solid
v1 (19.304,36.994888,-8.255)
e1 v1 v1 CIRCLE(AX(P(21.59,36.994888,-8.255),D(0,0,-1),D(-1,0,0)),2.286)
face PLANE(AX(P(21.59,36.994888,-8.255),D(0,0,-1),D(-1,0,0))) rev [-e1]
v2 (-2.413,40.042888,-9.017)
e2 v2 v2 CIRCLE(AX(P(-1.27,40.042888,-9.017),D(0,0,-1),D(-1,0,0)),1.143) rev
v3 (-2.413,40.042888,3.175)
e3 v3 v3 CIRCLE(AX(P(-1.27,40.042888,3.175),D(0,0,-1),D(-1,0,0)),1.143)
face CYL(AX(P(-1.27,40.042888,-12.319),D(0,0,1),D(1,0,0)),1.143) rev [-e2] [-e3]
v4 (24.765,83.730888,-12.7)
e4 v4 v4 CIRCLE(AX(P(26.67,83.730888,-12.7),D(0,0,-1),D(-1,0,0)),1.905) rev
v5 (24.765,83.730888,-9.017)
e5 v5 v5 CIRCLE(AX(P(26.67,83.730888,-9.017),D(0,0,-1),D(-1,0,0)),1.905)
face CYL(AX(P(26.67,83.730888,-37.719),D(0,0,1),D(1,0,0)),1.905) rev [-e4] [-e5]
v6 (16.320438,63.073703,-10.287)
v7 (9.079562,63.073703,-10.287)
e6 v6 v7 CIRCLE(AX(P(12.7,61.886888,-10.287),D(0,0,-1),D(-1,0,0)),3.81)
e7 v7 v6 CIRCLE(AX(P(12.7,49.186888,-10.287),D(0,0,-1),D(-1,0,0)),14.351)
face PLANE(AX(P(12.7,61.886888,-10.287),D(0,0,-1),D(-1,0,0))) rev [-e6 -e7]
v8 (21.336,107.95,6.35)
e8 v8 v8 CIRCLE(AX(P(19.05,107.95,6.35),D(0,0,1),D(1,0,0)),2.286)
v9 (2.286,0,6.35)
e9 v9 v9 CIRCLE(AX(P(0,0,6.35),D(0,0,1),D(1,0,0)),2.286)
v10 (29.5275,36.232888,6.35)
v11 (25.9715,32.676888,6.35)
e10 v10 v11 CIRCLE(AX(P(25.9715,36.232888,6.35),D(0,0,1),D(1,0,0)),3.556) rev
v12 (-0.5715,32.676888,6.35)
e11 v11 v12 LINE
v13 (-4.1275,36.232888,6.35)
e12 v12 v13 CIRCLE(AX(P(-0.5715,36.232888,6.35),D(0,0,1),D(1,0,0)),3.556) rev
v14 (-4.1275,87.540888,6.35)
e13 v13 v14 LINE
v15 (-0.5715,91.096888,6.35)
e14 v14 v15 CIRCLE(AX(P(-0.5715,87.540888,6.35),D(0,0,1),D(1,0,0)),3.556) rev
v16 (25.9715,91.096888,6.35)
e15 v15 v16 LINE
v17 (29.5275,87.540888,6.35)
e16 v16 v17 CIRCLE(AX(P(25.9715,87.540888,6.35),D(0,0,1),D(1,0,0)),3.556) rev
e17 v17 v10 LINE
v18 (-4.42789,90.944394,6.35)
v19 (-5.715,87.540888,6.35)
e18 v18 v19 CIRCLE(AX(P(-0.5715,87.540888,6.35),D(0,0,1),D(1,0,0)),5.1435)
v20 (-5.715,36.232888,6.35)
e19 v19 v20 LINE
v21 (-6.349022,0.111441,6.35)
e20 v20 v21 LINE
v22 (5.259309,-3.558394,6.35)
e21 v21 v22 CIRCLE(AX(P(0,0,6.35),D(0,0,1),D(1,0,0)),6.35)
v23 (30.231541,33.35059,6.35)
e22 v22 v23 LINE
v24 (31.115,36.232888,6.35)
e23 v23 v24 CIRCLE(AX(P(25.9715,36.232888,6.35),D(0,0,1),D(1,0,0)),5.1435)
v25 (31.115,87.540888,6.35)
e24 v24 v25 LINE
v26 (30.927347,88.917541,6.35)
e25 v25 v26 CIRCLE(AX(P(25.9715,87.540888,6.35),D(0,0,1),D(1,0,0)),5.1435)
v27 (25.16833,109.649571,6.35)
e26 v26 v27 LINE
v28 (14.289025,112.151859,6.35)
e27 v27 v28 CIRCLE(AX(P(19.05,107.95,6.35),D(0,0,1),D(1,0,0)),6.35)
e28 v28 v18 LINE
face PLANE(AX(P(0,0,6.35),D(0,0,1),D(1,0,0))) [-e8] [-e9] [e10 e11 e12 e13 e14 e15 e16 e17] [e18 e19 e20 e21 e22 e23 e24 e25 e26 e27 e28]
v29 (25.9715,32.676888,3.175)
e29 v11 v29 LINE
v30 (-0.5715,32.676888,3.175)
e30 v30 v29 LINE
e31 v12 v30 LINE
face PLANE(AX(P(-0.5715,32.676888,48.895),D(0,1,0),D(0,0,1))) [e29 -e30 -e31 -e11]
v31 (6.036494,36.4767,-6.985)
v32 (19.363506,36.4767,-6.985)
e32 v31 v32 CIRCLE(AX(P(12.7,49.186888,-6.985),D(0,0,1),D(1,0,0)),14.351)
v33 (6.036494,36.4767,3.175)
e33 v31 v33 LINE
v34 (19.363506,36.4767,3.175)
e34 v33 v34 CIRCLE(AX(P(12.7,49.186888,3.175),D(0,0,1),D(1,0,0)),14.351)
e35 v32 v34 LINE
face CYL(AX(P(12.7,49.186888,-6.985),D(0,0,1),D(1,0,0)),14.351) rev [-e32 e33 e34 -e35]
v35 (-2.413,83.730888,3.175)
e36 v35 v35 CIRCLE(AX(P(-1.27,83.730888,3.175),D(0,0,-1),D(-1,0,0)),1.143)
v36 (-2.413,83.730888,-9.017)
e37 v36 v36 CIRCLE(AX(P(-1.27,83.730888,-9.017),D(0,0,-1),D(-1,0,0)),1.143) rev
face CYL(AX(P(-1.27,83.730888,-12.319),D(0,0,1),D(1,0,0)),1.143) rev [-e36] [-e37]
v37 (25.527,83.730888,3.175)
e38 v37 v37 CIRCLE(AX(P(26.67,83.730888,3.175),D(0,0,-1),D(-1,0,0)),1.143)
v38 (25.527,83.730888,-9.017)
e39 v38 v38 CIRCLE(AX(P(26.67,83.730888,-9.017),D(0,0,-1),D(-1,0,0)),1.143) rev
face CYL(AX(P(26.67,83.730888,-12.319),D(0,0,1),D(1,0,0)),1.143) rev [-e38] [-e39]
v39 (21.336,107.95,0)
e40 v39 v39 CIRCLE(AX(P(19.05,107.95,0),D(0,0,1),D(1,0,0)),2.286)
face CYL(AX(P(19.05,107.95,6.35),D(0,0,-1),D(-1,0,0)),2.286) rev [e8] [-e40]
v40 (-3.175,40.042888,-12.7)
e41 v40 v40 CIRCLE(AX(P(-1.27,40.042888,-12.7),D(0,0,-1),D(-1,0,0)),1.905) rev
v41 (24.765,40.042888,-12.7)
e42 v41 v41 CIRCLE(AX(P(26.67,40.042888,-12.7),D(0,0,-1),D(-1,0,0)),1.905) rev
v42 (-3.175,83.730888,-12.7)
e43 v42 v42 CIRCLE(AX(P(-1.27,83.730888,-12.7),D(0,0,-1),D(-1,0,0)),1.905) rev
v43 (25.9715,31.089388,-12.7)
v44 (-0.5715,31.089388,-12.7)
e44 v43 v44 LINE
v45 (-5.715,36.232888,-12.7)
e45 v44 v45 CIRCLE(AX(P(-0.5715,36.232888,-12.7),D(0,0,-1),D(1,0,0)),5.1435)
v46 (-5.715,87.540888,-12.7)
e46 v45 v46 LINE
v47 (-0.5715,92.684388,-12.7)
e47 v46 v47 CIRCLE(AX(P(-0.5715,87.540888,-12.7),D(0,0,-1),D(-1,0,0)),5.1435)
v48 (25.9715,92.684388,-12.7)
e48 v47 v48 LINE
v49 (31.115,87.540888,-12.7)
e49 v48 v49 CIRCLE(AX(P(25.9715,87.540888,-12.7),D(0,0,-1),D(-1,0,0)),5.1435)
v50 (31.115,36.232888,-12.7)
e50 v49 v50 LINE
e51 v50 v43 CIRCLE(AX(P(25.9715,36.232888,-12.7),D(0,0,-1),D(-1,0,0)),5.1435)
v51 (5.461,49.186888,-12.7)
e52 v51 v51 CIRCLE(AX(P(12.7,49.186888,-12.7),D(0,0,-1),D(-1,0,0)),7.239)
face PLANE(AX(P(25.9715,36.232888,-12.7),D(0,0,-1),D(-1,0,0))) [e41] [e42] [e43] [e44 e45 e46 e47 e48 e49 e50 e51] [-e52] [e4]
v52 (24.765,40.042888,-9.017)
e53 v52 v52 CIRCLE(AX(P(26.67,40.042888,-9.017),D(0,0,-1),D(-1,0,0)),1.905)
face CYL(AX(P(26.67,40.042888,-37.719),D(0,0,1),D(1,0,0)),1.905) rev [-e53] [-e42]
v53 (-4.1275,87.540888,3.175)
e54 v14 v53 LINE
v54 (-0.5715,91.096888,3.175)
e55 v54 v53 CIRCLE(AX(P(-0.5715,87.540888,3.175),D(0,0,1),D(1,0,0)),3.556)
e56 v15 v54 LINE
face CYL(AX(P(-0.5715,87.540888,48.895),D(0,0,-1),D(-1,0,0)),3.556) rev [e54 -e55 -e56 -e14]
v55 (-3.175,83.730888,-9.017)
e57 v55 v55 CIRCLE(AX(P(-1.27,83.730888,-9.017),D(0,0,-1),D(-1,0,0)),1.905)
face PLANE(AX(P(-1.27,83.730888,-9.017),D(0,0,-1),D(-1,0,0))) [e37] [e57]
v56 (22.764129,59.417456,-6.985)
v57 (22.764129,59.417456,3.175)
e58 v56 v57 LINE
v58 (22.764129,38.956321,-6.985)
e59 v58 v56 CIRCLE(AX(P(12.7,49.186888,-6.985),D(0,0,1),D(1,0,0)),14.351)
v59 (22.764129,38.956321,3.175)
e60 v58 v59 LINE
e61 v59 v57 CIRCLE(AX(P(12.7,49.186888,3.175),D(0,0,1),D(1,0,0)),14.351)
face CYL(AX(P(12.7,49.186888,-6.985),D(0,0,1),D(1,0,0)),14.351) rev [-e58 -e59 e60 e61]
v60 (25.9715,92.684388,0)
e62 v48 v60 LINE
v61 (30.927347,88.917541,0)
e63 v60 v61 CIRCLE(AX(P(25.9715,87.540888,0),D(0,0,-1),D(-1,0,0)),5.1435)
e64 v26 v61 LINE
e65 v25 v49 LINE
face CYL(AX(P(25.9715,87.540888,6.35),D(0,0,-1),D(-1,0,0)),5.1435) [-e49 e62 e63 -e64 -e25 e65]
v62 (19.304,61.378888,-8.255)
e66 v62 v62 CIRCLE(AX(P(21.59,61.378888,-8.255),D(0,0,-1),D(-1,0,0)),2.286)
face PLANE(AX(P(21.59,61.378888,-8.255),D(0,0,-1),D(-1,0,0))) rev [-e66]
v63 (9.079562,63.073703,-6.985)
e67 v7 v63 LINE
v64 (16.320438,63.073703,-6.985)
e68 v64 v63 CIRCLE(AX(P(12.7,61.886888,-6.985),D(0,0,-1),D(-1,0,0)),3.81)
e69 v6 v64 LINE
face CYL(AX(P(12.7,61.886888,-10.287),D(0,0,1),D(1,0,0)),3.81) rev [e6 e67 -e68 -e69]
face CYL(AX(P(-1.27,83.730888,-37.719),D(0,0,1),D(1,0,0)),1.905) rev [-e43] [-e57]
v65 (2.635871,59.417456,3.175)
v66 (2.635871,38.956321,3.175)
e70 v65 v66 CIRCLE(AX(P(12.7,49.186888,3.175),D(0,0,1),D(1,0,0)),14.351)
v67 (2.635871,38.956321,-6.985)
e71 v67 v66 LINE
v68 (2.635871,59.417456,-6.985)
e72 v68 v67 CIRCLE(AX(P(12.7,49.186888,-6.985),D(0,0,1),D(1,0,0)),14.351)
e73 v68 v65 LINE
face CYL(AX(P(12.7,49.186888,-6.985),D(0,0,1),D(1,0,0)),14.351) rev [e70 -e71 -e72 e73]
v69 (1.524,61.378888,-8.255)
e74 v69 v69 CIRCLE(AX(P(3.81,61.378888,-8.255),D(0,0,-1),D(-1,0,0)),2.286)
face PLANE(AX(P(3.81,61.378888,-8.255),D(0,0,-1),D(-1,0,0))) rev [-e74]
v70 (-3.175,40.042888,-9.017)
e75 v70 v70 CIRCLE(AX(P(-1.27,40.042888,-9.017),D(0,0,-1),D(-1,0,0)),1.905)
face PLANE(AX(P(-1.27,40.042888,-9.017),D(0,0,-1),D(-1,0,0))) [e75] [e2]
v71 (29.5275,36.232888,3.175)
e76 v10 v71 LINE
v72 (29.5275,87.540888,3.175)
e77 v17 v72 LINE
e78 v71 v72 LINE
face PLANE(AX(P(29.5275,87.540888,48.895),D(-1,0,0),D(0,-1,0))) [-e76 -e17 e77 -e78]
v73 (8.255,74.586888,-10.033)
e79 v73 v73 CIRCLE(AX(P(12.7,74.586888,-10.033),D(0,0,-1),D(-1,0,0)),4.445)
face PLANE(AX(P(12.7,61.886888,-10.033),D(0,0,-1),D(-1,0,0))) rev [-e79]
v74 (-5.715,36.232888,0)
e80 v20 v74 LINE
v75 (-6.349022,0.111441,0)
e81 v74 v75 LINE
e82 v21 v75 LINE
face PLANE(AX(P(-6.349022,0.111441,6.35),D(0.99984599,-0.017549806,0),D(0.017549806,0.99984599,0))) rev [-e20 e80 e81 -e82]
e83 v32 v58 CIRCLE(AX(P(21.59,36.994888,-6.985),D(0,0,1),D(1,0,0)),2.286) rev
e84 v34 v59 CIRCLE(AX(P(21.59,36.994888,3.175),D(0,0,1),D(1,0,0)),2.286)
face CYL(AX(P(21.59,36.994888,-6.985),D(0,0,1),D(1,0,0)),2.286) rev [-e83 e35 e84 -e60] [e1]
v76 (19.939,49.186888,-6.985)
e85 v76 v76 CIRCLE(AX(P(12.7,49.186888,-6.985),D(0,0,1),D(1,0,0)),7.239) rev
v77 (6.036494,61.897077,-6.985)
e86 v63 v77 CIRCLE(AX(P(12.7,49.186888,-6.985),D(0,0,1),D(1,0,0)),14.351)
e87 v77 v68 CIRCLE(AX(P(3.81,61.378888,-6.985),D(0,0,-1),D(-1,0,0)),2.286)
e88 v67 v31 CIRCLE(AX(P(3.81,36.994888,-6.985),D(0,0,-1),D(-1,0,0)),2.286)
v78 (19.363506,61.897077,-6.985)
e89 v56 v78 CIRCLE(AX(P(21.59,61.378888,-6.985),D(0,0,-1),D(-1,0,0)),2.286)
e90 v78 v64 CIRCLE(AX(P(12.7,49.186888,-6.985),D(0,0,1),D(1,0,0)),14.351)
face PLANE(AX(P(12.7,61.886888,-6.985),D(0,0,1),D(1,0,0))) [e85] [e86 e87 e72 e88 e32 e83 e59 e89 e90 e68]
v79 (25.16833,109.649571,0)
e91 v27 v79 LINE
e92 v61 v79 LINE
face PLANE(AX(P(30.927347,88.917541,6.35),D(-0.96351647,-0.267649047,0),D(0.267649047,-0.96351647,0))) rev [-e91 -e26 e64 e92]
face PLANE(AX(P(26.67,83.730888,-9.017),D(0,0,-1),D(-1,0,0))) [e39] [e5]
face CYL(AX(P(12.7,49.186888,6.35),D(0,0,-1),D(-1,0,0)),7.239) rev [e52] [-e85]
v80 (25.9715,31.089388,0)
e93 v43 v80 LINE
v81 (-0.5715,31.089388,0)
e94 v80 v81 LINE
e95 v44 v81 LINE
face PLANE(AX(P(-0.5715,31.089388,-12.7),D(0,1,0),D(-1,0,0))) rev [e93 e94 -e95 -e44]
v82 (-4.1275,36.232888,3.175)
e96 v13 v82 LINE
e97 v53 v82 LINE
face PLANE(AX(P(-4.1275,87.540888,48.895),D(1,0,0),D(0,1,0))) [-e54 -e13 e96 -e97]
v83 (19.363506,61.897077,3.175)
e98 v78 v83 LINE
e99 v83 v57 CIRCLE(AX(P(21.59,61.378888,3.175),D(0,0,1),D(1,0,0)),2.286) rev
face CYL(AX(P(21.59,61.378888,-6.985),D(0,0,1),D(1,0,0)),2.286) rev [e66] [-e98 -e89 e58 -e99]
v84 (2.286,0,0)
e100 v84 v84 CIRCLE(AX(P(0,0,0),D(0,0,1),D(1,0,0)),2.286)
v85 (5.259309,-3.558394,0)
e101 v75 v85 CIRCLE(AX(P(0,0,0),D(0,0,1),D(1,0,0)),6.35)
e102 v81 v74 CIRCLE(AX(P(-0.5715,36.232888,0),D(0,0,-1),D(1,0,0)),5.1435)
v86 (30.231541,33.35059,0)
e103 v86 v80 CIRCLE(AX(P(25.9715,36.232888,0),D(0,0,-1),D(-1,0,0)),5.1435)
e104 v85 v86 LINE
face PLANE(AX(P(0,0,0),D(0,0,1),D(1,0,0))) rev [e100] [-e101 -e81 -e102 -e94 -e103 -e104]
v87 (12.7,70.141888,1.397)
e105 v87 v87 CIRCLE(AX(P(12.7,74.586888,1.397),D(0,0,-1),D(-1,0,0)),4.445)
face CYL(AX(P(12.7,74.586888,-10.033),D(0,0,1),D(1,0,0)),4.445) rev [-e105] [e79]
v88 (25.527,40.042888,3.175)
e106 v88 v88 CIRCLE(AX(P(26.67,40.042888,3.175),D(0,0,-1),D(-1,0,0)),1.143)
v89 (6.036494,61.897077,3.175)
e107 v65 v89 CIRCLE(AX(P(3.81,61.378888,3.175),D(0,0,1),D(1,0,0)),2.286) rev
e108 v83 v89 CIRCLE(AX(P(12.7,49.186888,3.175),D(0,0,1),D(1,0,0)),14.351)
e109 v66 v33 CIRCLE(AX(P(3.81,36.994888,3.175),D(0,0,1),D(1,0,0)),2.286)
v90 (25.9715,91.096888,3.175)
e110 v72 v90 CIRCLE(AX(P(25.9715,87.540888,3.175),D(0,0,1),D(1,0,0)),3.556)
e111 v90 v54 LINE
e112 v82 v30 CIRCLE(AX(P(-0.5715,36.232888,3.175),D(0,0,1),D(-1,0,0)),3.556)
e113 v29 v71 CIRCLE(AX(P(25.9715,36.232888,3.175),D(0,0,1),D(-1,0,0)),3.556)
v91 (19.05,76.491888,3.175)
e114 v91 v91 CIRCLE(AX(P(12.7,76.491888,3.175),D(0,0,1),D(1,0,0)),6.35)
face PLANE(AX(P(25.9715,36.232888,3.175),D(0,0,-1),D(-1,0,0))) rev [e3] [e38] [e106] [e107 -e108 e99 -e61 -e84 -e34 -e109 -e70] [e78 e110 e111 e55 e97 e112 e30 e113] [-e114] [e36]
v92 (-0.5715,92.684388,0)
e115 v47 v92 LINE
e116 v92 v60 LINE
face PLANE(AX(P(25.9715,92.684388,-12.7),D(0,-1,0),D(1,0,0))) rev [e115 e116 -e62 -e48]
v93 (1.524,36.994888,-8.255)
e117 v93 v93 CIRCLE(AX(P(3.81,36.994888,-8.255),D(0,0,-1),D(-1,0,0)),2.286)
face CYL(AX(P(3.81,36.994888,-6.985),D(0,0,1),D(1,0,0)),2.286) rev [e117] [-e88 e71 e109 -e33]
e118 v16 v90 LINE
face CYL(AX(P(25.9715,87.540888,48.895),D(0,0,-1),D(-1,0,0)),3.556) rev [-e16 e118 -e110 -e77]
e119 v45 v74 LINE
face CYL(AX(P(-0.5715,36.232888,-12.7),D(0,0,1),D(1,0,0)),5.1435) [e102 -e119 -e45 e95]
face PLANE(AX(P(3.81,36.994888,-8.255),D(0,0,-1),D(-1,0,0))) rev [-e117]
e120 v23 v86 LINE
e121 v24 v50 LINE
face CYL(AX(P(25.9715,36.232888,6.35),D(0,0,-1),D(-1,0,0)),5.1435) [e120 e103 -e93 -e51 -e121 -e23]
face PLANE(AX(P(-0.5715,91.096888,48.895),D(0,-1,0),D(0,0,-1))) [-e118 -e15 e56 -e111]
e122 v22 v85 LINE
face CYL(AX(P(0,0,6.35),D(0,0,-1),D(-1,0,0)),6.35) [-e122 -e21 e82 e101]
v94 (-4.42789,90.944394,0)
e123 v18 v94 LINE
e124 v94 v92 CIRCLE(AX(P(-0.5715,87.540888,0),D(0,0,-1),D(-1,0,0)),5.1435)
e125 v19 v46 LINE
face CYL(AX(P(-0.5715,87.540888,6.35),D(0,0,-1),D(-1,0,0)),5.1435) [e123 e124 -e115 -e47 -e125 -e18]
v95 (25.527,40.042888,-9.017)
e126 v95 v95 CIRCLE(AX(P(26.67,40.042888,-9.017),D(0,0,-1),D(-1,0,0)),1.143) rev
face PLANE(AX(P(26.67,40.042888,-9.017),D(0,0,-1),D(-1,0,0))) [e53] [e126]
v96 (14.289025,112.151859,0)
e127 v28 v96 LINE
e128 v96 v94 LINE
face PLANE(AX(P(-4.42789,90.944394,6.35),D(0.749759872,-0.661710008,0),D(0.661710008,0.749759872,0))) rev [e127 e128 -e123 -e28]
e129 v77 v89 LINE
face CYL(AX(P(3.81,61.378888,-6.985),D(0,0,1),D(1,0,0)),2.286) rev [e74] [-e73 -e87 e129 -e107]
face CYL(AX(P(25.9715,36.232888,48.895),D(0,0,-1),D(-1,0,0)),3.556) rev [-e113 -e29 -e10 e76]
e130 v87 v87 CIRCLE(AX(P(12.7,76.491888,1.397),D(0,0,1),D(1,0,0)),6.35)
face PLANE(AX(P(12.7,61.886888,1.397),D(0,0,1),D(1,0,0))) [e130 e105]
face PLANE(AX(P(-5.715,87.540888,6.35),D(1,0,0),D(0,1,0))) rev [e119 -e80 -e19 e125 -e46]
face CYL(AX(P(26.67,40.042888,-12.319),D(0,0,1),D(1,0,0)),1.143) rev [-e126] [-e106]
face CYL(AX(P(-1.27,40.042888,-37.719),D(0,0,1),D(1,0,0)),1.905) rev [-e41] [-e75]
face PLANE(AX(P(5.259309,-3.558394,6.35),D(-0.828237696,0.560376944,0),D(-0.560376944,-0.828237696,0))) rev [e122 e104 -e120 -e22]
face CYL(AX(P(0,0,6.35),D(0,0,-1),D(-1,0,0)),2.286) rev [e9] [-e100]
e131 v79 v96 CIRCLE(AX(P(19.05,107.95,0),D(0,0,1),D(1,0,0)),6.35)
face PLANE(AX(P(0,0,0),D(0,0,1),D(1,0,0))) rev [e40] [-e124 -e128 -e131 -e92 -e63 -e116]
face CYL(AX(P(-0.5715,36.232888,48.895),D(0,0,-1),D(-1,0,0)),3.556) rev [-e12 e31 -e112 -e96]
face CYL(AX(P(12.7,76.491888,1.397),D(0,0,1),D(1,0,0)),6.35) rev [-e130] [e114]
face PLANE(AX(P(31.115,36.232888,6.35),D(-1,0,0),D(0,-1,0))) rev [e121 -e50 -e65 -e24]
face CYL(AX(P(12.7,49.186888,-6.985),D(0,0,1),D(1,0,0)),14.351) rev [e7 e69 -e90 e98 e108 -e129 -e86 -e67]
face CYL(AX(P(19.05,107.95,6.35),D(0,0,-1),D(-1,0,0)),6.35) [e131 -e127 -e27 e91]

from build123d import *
from build123d.topology import SkipClean

# Parameters (mm, degrees)
SKETCH1_R             = 2.286
SKETCH1_R_2           = 7.239
BOSS_EXTRUDE1_DEPTH   = 6.35
BOSS_EXTRUDE2_START   = 12.7
SKETCH2_R             = 7.239
BOSS_EXTRUDE2_DEPTH   = 12.7
CAVITY1_START         = -6.985
CAVITY1_OUTLINE_R     = 1.143
CAVITY1_OUTLINE_R_2   = 7.239
CAVITY1_OUTLINE_R_3   = 4.445
CAVITY1_DEPTH         = 13.335
CAVITY1_START_2       = 3.175
CAVITY1_2_OUTLINE_R   = 1.143
CAVITY1_2_OUTLINE_R_2 = 4.445
CAVITY1_2_DEPTH       = 3.175
CAVITY1_START_3       = -10.033
CAVITY1_3_OUTLINE_R   = 1.143
CAVITY1_3_OUTLINE_R_2 = 4.445
CAVITY1_3_DEPTH       = 3.048
CAVITY1_START_4       = -12.7
CAVITY1_4_OUTLINE_R   = 1.905
CAVITY1_4_DEPTH       = 3.683
CAVITY1_START_5       = 1.397
CAVITY1_5_DEPTH       = 1.778
CAVITY1_START_6       = -8.255
CAVITY1_6_OUTLINE_R   = 2.286
CAVITY1_6_DEPTH       = 1.27
CAVITY1_START_7       = -10.287
CAVITY1_7_DEPTH       = 0.254


# Read off the part's stored shape, not the designer's step: Cavity1
with BuildPart() as part:
    # Sketch1 → Boss-Extrude1 (new body)
    with BuildSketch(Plane.XY):
        with BuildLine():
            Line((-6.349022038, 0.111441268), (-5.715, 36.232888497))
            Line((-5.715, 36.232888497), (-5.715, 87.540888497))
            ThreePointArc((-5.715, 87.540888497), (-5.382473587, 89.360263498), (-4.427889902, 90.944393921))
            Line((-4.427889902, 90.944393921), (14.289024812, 112.151858549))
            ThreePointArc((14.289024812, 112.151858549), (20.473363243, 114.138419595), (25.168329583, 109.649571449))
            Line((25.168329583, 109.649571449), (30.927346962, 88.917541371))
            ThreePointArc((30.927346962, 88.917541371), (31.067870822, 88.235580298), (31.115, 87.540888497))
            Line((31.115, 87.540888497), (31.115, 36.232888497))
            ThreePointArc((31.115, 36.232888497), (30.889177857, 34.725560815), (30.231540589, 33.350589687))
            Line((30.231540589, 33.350589687), (5.259309369, -3.558393593))
            ThreePointArc((5.259309369, -3.558393593), (-1.914103028, -6.054643639), (-6.349022038, 0.111441268))
        make_face()
        Circle(SKETCH1_R, mode=Mode.SUBTRACT)
        with Locations((19.05, 107.95)):
            Circle(SKETCH1_R, mode=Mode.SUBTRACT)
        with Locations((12.7, 49.186888497)):
            Circle(SKETCH1_R_2, mode=Mode.SUBTRACT)
    extrude(amount=BOSS_EXTRUDE1_DEPTH)

    # Sketch2 → Boss-Extrude2 (add)
    with SkipClean():  # the faces are left unmerged after this step: merging them gives an invalid solid
        with BuildSketch(Plane(origin=(0, 0, 0), x_dir=(-1, 0, 0), z_dir=(0, 0, -1)).offset(BOSS_EXTRUDE2_START)):
            with BuildLine():
                Line((-31.115, 36.232888497), (-31.115, 87.540888497))
                ThreePointArc((-31.115, 87.540888497), (-29.608503729, 91.177892226), (-25.9715, 92.684388497))
                Line((-25.9715, 92.684388497), (0.5715, 92.684388497))
                ThreePointArc((0.5715, 92.684388497), (4.208503729, 91.177892226), (5.715, 87.540888497))
                Line((5.715, 87.540888497), (5.715, 36.232888497))
                ThreePointArc((5.715, 36.232888497), (4.208503729, 32.595884768), (0.5715, 31.089388497))
                Line((0.5715, 31.089388497), (-25.9715, 31.089388497))
                ThreePointArc((-25.9715, 31.089388497), (-29.608503729, 32.595884768), (-31.115, 36.232888497))
            make_face()
            with Locations((-12.7, 49.186888497)):
                Circle(SKETCH2_R, mode=Mode.SUBTRACT)
        extrude(amount=-BOSS_EXTRUDE2_DEPTH)

    # Cavity1 outline → Cavity1 (cut)
    # profile 1 of 6: a face of its own
    with BuildSketch(Plane.XY.offset(CAVITY1_START)):
        with Locations((26.67, 40.042888497)):
            Circle(CAVITY1_OUTLINE_R)
    # profile 2 of 6: a face of its own
    with BuildSketch(Plane.XY.offset(CAVITY1_START)):
        with BuildLine():
            ThreePointArc((22.764128852, 38.956320993), (27.051, 49.186888497), (22.764128852, 59.417456))
            ThreePointArc((22.764128852, 59.417456), (22.936847552, 63.225993711), (19.363505747, 61.897077015))
            ThreePointArc((19.363505747, 61.897077015), (12.7, 63.537888497), (6.036494253, 61.897077015))
            ThreePointArc((6.036494253, 61.897077015), (2.463152448, 63.225993711), (2.635871148, 59.417456))
            ThreePointArc((2.635871148, 59.417456), (-1.651, 49.186888497), (2.635871148, 38.956320993))
            ThreePointArc((2.635871148, 38.956320993), (2.463152448, 35.147783283), (6.036494253, 36.476699979))
            ThreePointArc((6.036494253, 36.476699979), (12.7, 34.835888497), (19.363505747, 36.476699979))
            ThreePointArc((19.363505747, 36.476699979), (22.936847552, 35.147783283), (22.764128852, 38.956320993))
        make_face()
        with Locations((12.7, 49.186888497)):
            Circle(CAVITY1_OUTLINE_R_2, mode=Mode.SUBTRACT)
    # profile 3 of 6: a face of its own
    with BuildSketch(Plane.XY.offset(CAVITY1_START)):
        with Locations((26.67, 83.730888497)):
            Circle(CAVITY1_OUTLINE_R)
    # profile 4 of 6: a face of its own
    with BuildSketch(Plane.XY.offset(CAVITY1_START)):
        with Locations((12.7, 74.586888497)):
            Circle(CAVITY1_OUTLINE_R_3)
    # profile 5 of 6: a face of its own
    with BuildSketch(Plane.XY.offset(CAVITY1_START)):
        with Locations((-1.27, 40.042888497)):
            Circle(CAVITY1_OUTLINE_R)
    # profile 6 of 6: a face of its own
    with BuildSketch(Plane.XY.offset(CAVITY1_START)):
        with Locations((-1.27, 83.730888497)):
            Circle(CAVITY1_OUTLINE_R)
    extrude(amount=CAVITY1_DEPTH, mode=Mode.SUBTRACT)

    # Cavity1 2 outline → Cavity1 2 (cut)
    with BuildSketch(Plane.XY.offset(CAVITY1_START_2)):
        with BuildLine():
            Line((29.5275, 36.232888497), (29.5275, 87.540888497))
            ThreePointArc((29.5275, 87.540888497), (28.485971714, 90.055360211), (25.9715, 91.096888497))
            Line((25.9715, 91.096888497), (-0.5715, 91.096888497))
            ThreePointArc((-0.5715, 91.096888497), (-3.085971714, 90.055360211), (-4.1275, 87.540888497))
            Line((-4.1275, 87.540888497), (-4.1275, 36.232888497))
            ThreePointArc((-4.1275, 36.232888497), (-3.085971714, 33.718416783), (-0.5715, 32.676888497))
            Line((-0.5715, 32.676888497), (25.9715, 32.676888497))
            ThreePointArc((25.9715, 32.676888497), (28.485971714, 33.718416783), (29.5275, 36.232888497))
        make_face()
        with Locations((26.67, 40.042888497)):
            Circle(CAVITY1_2_OUTLINE_R, mode=Mode.SUBTRACT)
        with BuildLine():
            ThreePointArc((19.363505747, 36.476699979), (12.7, 34.835888497), (6.036494253, 36.476699979))
            ThreePointArc((6.036494253, 36.476699979), (2.463152448, 35.147783283), (2.635871148, 38.956320993))
            ThreePointArc((2.635871148, 38.956320993), (-1.651, 49.186888497), (2.635871148, 59.417456))
            ThreePointArc((2.635871148, 59.417456), (2.463152448, 63.225993711), (6.036494253, 61.897077015))
            ThreePointArc((6.036494253, 61.897077015), (12.7, 63.537888497), (19.363505747, 61.897077015))
            ThreePointArc((19.363505747, 61.897077015), (22.936847552, 63.225993711), (22.764128852, 59.417456))
            ThreePointArc((22.764128852, 59.417456), (27.051, 49.186888497), (22.764128852, 38.956320993))
            ThreePointArc((22.764128852, 38.956320993), (22.936847552, 35.147783283), (19.363505747, 36.476699979))
        make_face(mode=Mode.SUBTRACT)
        with Locations((12.7, 74.586888497)):
            Circle(CAVITY1_2_OUTLINE_R_2, mode=Mode.SUBTRACT)
        with Locations((26.67, 83.730888497)):
            Circle(CAVITY1_2_OUTLINE_R, mode=Mode.SUBTRACT)
        with Locations((-1.27, 40.042888497)):
            Circle(CAVITY1_2_OUTLINE_R, mode=Mode.SUBTRACT)
        with Locations((-1.27, 83.730888497)):
            Circle(CAVITY1_2_OUTLINE_R, mode=Mode.SUBTRACT)
    extrude(amount=CAVITY1_2_DEPTH, mode=Mode.SUBTRACT)

    # Cavity1 3 outline → Cavity1 3 (cut)
    with BuildSketch(Plane.XY.offset(CAVITY1_START_3)):
        with Locations((26.67, 40.042888497)):
            Circle(CAVITY1_3_OUTLINE_R)
        with Locations((26.67, 83.730888497)):
            Circle(CAVITY1_3_OUTLINE_R)
        with BuildLine():
            ThreePointArc((9.07956216, 63.073703497), (12.7, 58.076888497), (16.32043784, 63.073703497))
            ThreePointArc((16.32043784, 63.073703497), (12.7, 63.537888497), (9.07956216, 63.073703497))
        make_face()
        with Locations((12.7, 74.586888497)):
            Circle(CAVITY1_3_OUTLINE_R_2)
        with Locations((-1.27, 40.042888497)):
            Circle(CAVITY1_3_OUTLINE_R)
        with Locations((-1.27, 83.730888497)):
            Circle(CAVITY1_3_OUTLINE_R)
    extrude(amount=CAVITY1_3_DEPTH, mode=Mode.SUBTRACT)

    # Cavity1 4 outline → Cavity1 4 (cut)
    with BuildSketch(Plane.XY.offset(CAVITY1_START_4)):
        with Locations((26.67, 40.042888497)):
            Circle(CAVITY1_4_OUTLINE_R)
        with Locations((26.67, 83.730888497)):
            Circle(CAVITY1_4_OUTLINE_R)
        with Locations((-1.27, 40.042888497)):
            Circle(CAVITY1_4_OUTLINE_R)
        with Locations((-1.27, 83.730888497)):
            Circle(CAVITY1_4_OUTLINE_R)
    extrude(amount=CAVITY1_4_DEPTH, mode=Mode.SUBTRACT)

    # Cavity1 5 outline → Cavity1 5 (cut)
    with BuildSketch(Plane.XY.offset(CAVITY1_START_5)):
        with BuildLine():
            Line((17.028512749, 73.575947162), (18.969761763, 75.485614461))
            ThreePointArc((18.969761763, 75.485614461), (19.029908656, 75.987154505), (19.05, 76.491888497))
            ThreePointArc((19.05, 76.491888497), (18.05067461, 79.911359394), (15.367234262, 82.254558138))
            Line((15.367234262, 82.254558138), (14.222653339, 78.762957439))
            ThreePointArc((14.222653339, 78.762957439), (16.341855234, 77.135400897), (17.145, 74.586888497))
            ThreePointArc((17.145, 74.586888497), (17.11578216, 74.078073289), (17.028512749, 73.575947162))
        make_face()
        with BuildLine():
            ThreePointArc((13.961900971, 70.268536833), (17.281043618, 72.094555286), (18.969761763, 75.485614461))
            Line((18.969761763, 75.485614461), (17.028512749, 73.575947162))
            ThreePointArc((17.028512749, 73.575947162), (15.927510814, 71.530550992), (13.945086436, 70.319830404))
            Line((13.945086436, 70.319830404), (13.961900971, 70.268536833))
        make_face()
        with BuildLine():
            Line((14.222653339, 78.762957439), (15.367234262, 82.254558138))
            ThreePointArc((15.367234262, 82.254558138), (12.7, 82.841888497), (10.032765738, 82.254558138))
            Line((10.032765738, 82.254558138), (11.177346661, 78.762957439))
            ThreePointArc((11.177346661, 78.762957439), (12.7, 79.031888497), (14.222653339, 78.762957439))
        make_face()
        with BuildLine():
            ThreePointArc((13.603307828, 70.206466079), (13.783049159, 70.234932007), (13.961900971, 70.268536833))
            Line((13.961900971, 70.268536833), (13.945086436, 70.319830404))
            ThreePointArc((13.945086436, 70.319830404), (13.793135953, 70.278399343), (13.639813077, 70.242377434))
            Line((13.639813077, 70.242377434), (13.603307828, 70.206466079))
        make_face()
        with BuildLine():
            Line((11.177346661, 78.762957439), (10.032765738, 82.254558138))
            ThreePointArc((10.032765738, 82.254558138), (7.094455948, 79.475238273), (6.430238237, 75.485614461))
            Line((6.430238237, 75.485614461), (8.371487251, 73.575947162))
            ThreePointArc((8.371487251, 73.575947162), (8.790357427, 76.701769096), (11.177346661, 78.762957439))
        make_face()
        with BuildLine():
            ThreePointArc((12.6999999, 70.141888497), (13.152806558, 70.158053464), (13.603307828, 70.206466079))
            Line((13.603307828, 70.206466079), (13.639813077, 70.242377434))
            ThreePointArc((13.639813077, 70.242377434), (13.172585034, 70.167082123), (12.6999999, 70.141888497))
        make_face()
        with BuildLine():
            Line((11.760186923, 70.242377434), (11.796692172, 70.206466079))
            ThreePointArc((11.796692172, 70.206466079), (12.247193343, 70.158053471), (12.6999999, 70.141888497))
            ThreePointArc((12.6999999, 70.141888497), (12.227414866, 70.167082133), (11.760186923, 70.242377434))
        make_face()
        with BuildLine():
            ThreePointArc((11.438099029, 70.268536833), (11.616950841, 70.234932007), (11.796692172, 70.206466079))
            Line((11.796692172, 70.206466079), (11.760186923, 70.242377434))
            ThreePointArc((11.760186923, 70.242377434), (11.606864047, 70.278399343), (11.454913564, 70.319830404))
            Line((11.454913564, 70.319830404), (11.438099029, 70.268536833))
        make_face()
        with BuildLine():
            ThreePointArc((6.430238237, 75.485614461), (8.118956382, 72.094555286), (11.438099029, 70.268536833))
            Line((11.438099029, 70.268536833), (11.454913564, 70.319830404))
            ThreePointArc((11.454913564, 70.319830404), (9.472489186, 71.530550992), (8.371487251, 73.575947162))
            Line((8.371487251, 73.575947162), (6.430238237, 75.485614461))
        make_face()
    extrude(amount=CAVITY1_5_DEPTH, mode=Mode.SUBTRACT)

    # Cavity1 6 outline → Cavity1 6 (cut)
    with BuildSketch(Plane.XY.offset(CAVITY1_START_6)):
        with Locations((21.59, 36.994888497)):
            Circle(CAVITY1_6_OUTLINE_R)
        with Locations((21.59, 61.378888497)):
            Circle(CAVITY1_6_OUTLINE_R)
        with Locations((3.81, 36.994888497)):
            Circle(CAVITY1_6_OUTLINE_R)
        with Locations((3.81, 61.378888497)):
            Circle(CAVITY1_6_OUTLINE_R)
    extrude(amount=CAVITY1_6_DEPTH, mode=Mode.SUBTRACT)

    # Cavity1 7 outline → Cavity1 7 (cut)
    with BuildSketch(Plane.XY.offset(CAVITY1_START_7)):
        with BuildLine():
            ThreePointArc((9.07956216, 63.073703497), (12.7, 58.076888497), (16.32043784, 63.073703497))
            ThreePointArc((16.32043784, 63.073703497), (12.7, 63.537888497), (9.07956216, 63.073703497))
        make_face()
    extrude(amount=CAVITY1_7_DEPTH, mode=Mode.SUBTRACT)


solid = part.part
